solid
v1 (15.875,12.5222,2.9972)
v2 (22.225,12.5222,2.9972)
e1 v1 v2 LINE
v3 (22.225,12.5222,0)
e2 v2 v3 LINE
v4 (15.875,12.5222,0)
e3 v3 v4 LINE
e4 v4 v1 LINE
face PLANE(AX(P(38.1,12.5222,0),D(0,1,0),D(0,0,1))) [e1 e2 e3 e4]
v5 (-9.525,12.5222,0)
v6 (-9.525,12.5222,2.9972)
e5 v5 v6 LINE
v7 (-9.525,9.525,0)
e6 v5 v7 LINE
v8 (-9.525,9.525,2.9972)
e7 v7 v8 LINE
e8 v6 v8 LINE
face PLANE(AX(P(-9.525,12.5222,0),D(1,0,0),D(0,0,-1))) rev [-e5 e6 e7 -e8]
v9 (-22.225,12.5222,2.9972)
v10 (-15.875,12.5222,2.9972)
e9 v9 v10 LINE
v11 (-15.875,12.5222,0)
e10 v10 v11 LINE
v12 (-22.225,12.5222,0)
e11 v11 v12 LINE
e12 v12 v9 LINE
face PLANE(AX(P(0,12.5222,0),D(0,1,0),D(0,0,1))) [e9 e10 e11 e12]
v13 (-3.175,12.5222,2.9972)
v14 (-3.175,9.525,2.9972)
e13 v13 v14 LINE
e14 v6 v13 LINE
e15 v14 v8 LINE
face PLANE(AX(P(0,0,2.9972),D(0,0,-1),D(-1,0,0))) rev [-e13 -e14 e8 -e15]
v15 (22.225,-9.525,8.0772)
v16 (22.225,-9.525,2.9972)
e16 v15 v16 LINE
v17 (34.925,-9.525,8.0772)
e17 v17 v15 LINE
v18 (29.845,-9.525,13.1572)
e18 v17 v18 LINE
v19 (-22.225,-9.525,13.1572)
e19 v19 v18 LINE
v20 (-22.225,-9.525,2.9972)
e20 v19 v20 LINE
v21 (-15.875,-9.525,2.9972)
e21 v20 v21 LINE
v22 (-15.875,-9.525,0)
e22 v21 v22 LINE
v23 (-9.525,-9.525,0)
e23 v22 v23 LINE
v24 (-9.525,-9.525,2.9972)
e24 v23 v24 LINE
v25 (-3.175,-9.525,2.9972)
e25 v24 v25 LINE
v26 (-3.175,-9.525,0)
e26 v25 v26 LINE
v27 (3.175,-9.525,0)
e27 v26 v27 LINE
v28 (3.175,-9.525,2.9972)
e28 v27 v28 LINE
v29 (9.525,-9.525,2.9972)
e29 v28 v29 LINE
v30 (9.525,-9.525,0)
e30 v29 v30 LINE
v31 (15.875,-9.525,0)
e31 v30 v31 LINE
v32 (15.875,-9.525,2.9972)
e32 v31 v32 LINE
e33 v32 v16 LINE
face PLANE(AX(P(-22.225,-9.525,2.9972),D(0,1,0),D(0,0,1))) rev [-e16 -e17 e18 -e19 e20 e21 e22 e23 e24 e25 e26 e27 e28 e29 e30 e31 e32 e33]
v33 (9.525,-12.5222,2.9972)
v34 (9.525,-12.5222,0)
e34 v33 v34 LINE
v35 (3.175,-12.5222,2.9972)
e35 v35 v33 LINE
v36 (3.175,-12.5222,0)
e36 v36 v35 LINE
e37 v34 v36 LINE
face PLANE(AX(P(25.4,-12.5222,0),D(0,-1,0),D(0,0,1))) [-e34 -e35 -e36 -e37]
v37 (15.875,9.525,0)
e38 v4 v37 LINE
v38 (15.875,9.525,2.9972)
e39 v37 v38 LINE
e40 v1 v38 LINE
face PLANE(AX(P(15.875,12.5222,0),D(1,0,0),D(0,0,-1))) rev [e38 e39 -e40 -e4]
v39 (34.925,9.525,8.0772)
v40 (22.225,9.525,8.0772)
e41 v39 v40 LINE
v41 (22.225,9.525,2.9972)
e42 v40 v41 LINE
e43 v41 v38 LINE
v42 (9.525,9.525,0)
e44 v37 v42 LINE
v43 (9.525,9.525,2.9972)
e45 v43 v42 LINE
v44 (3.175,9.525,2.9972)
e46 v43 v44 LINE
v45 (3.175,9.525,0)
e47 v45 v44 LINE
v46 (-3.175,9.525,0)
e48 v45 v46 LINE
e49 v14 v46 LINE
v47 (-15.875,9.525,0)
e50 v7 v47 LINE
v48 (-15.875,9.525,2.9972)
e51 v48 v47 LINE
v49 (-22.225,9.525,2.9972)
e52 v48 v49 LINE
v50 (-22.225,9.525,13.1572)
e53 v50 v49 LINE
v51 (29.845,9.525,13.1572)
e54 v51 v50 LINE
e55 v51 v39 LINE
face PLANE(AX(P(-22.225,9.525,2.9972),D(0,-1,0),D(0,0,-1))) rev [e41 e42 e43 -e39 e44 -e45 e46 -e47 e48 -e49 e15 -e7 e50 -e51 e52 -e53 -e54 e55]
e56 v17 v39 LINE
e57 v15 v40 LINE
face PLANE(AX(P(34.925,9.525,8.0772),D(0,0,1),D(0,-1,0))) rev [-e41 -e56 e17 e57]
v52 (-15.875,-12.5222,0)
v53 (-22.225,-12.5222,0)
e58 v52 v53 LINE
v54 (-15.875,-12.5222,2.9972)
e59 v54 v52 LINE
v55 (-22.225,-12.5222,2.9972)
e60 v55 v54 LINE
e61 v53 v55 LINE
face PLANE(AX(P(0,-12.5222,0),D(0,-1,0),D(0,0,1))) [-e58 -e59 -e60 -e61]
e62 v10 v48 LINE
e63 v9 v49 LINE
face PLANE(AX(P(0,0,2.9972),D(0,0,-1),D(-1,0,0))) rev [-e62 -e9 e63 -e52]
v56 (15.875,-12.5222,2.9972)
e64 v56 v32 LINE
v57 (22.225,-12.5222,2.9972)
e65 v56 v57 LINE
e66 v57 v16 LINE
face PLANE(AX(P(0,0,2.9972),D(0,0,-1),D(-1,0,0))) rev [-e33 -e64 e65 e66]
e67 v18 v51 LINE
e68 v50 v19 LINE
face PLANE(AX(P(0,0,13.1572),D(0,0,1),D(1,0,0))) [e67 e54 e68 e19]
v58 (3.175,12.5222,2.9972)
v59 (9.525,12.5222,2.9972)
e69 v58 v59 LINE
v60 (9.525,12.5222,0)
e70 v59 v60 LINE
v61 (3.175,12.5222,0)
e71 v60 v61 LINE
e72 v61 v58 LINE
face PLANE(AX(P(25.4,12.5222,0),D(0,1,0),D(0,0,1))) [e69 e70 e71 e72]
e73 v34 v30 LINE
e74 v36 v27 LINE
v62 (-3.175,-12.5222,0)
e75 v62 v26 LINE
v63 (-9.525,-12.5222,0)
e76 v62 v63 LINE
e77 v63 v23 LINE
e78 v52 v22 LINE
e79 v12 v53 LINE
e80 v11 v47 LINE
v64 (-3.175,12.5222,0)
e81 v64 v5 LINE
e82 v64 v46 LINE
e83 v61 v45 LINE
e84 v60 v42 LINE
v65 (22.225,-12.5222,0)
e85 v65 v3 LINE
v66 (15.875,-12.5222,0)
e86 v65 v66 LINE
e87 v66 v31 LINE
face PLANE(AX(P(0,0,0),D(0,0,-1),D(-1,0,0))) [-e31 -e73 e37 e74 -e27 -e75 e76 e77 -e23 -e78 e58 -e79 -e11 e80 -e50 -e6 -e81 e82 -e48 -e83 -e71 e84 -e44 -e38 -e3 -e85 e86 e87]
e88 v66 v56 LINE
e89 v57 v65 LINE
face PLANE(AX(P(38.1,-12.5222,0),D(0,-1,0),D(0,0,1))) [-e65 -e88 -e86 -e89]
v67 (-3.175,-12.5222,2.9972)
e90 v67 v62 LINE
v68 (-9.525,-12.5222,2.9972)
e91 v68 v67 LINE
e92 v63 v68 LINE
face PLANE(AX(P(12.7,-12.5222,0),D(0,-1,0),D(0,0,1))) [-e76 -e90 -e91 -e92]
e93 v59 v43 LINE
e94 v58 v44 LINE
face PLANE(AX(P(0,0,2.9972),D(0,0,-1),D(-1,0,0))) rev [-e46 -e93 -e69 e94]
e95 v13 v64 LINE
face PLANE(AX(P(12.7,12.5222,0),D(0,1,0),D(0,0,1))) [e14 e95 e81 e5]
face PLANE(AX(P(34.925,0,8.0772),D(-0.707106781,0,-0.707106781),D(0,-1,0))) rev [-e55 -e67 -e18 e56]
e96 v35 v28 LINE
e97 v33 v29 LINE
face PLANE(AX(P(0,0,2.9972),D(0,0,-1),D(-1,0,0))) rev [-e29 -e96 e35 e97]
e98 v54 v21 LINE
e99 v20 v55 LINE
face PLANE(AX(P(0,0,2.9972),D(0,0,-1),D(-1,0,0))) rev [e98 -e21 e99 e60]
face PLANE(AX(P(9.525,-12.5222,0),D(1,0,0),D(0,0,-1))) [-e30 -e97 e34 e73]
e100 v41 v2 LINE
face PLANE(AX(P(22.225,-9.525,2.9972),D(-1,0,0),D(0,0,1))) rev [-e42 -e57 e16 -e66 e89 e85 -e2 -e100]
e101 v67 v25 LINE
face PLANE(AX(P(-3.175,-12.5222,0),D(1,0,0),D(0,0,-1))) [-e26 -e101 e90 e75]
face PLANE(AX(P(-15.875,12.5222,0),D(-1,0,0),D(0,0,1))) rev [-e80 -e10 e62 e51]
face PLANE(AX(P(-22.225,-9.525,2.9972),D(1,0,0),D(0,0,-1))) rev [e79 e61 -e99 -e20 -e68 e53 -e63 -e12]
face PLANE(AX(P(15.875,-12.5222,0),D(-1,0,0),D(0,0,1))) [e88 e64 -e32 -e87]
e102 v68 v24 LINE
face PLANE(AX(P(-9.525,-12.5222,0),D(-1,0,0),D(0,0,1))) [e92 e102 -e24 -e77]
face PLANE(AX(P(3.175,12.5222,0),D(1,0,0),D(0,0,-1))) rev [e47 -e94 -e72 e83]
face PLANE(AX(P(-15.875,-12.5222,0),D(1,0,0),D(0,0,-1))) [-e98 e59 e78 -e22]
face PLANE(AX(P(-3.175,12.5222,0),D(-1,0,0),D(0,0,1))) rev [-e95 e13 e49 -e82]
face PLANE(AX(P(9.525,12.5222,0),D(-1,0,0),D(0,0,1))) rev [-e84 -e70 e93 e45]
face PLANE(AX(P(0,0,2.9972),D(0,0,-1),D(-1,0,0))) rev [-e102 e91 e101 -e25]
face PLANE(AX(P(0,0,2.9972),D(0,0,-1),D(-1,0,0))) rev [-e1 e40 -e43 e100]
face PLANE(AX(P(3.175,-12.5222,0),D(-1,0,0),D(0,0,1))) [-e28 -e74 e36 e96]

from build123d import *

# Parameters (mm, degrees)
SKETCH1_W               = 44.45
SKETCH1_H               = 19.05
BODY_DEPTH              = 2.9972
SKETCH2_W               = 6.35
SKETCH2_H               = 2.9972
TAB_DEPTH               = 2.9972
LPATTERN1_COUNT         = 4
LPATTERN1_PITCH         = 12.7
MIRROR1_COPY_1_SKETCH_W = 6.35
MIRROR1_COPY_1_SKETCH_H = 2.9972
MIRROR1_COPY_1_DEPTH    = 2.9972
MIRROR1_COPY_2_SKETCH_W = 6.35
MIRROR1_COPY_2_SKETCH_H = 2.9972
MIRROR1_COPY_2_DEPTH    = 2.9972
MIRROR1_COPY_3_SKETCH_W = 6.35
MIRROR1_COPY_3_SKETCH_H = 2.9972
MIRROR1_COPY_3_DEPTH    = 2.9972
SKETCH3_W               = 44.45
SKETCH3_H               = 19.05
BOSS_EXTRUDE1_DEPTH     = 10.16
SKETCH4_W               = 5.08
SKETCH4_H               = 19.05
BOSS_EXTRUDE2_DEPTH     = 12.7
CHAMFER1_SIZE           = 5.08


with BuildPart() as part:
    # Sketch1 → Body (new body)
    with BuildSketch(Plane.XY):
        Rectangle(SKETCH1_W, SKETCH1_H)
    extrude(amount=BODY_DEPTH)

    # Sketch2 → Tab (add)
    with BuildSketch(Plane(origin=(0, 9.525, 0), x_dir=(1, 0, 0), z_dir=(0, 1, 0))):
        with Locations((-19.05, -1.4986)):
            Rectangle(SKETCH2_W, SKETCH2_H)
    tab = extrude(amount=TAB_DEPTH)

    # LPattern1: Tab ×4
    with Locations(*[(i * LPATTERN1_PITCH, 0, 0) for i in range(1, LPATTERN1_COUNT)]):
        add(tab)

    # Mirror1: Tab across plane
    add(tab.mirror(Plane.ZX))

    # Mirror1 copy 1 sketch → Mirror1 copy 1 (add)
    with BuildSketch(Plane(origin=(12.7, -9.525, 0), x_dir=(1, 0, 0), z_dir=(0, -1, 0))):
        with Locations((-19.05, 1.4986)):
            Rectangle(MIRROR1_COPY_1_SKETCH_W, MIRROR1_COPY_1_SKETCH_H)
    extrude(amount=MIRROR1_COPY_1_DEPTH)

    # Mirror1 copy 2 sketch → Mirror1 copy 2 (add)
    with BuildSketch(Plane(origin=(25.4, -9.525, 0), x_dir=(1, 0, 0), z_dir=(0, -1, 0))):
        with Locations((-19.05, 1.4986)):
            Rectangle(MIRROR1_COPY_2_SKETCH_W, MIRROR1_COPY_2_SKETCH_H)
    extrude(amount=MIRROR1_COPY_2_DEPTH)

    # Mirror1 copy 3 sketch → Mirror1 copy 3 (add)
    with BuildSketch(Plane(origin=(38.1, -9.525, 0), x_dir=(1, 0, 0), z_dir=(0, -1, 0))):
        with Locations((-19.05, 1.4986)):
            Rectangle(MIRROR1_COPY_3_SKETCH_W, MIRROR1_COPY_3_SKETCH_H)
    extrude(amount=MIRROR1_COPY_3_DEPTH)

    # Sketch3 → Boss-Extrude1 (add)
    with BuildSketch(Plane.XY.offset(2.9972)):
        Rectangle(SKETCH3_W, SKETCH3_H)
    extrude(amount=BOSS_EXTRUDE1_DEPTH)

    # Sketch4 → Boss-Extrude2 (add)
    with BuildSketch(Plane(origin=(22.225, 0, 0), x_dir=(0, 0, -1), z_dir=(1, 0, 0))):
        with Locations((-10.6172, 0)):
            Rectangle(SKETCH4_W, SKETCH4_H)
    extrude(amount=BOSS_EXTRUDE2_DEPTH)

    # Chamfer1
    chamfer1_edges = [part.edges().sort_by_distance(p)[0] for p in [
        (34.925, 0, 13.1572),
    ]]
    chamfer(chamfer1_edges, length=CHAMFER1_SIZE - 0.0001)  # a hair under: the kernel refuses the full size


solid = part.part
